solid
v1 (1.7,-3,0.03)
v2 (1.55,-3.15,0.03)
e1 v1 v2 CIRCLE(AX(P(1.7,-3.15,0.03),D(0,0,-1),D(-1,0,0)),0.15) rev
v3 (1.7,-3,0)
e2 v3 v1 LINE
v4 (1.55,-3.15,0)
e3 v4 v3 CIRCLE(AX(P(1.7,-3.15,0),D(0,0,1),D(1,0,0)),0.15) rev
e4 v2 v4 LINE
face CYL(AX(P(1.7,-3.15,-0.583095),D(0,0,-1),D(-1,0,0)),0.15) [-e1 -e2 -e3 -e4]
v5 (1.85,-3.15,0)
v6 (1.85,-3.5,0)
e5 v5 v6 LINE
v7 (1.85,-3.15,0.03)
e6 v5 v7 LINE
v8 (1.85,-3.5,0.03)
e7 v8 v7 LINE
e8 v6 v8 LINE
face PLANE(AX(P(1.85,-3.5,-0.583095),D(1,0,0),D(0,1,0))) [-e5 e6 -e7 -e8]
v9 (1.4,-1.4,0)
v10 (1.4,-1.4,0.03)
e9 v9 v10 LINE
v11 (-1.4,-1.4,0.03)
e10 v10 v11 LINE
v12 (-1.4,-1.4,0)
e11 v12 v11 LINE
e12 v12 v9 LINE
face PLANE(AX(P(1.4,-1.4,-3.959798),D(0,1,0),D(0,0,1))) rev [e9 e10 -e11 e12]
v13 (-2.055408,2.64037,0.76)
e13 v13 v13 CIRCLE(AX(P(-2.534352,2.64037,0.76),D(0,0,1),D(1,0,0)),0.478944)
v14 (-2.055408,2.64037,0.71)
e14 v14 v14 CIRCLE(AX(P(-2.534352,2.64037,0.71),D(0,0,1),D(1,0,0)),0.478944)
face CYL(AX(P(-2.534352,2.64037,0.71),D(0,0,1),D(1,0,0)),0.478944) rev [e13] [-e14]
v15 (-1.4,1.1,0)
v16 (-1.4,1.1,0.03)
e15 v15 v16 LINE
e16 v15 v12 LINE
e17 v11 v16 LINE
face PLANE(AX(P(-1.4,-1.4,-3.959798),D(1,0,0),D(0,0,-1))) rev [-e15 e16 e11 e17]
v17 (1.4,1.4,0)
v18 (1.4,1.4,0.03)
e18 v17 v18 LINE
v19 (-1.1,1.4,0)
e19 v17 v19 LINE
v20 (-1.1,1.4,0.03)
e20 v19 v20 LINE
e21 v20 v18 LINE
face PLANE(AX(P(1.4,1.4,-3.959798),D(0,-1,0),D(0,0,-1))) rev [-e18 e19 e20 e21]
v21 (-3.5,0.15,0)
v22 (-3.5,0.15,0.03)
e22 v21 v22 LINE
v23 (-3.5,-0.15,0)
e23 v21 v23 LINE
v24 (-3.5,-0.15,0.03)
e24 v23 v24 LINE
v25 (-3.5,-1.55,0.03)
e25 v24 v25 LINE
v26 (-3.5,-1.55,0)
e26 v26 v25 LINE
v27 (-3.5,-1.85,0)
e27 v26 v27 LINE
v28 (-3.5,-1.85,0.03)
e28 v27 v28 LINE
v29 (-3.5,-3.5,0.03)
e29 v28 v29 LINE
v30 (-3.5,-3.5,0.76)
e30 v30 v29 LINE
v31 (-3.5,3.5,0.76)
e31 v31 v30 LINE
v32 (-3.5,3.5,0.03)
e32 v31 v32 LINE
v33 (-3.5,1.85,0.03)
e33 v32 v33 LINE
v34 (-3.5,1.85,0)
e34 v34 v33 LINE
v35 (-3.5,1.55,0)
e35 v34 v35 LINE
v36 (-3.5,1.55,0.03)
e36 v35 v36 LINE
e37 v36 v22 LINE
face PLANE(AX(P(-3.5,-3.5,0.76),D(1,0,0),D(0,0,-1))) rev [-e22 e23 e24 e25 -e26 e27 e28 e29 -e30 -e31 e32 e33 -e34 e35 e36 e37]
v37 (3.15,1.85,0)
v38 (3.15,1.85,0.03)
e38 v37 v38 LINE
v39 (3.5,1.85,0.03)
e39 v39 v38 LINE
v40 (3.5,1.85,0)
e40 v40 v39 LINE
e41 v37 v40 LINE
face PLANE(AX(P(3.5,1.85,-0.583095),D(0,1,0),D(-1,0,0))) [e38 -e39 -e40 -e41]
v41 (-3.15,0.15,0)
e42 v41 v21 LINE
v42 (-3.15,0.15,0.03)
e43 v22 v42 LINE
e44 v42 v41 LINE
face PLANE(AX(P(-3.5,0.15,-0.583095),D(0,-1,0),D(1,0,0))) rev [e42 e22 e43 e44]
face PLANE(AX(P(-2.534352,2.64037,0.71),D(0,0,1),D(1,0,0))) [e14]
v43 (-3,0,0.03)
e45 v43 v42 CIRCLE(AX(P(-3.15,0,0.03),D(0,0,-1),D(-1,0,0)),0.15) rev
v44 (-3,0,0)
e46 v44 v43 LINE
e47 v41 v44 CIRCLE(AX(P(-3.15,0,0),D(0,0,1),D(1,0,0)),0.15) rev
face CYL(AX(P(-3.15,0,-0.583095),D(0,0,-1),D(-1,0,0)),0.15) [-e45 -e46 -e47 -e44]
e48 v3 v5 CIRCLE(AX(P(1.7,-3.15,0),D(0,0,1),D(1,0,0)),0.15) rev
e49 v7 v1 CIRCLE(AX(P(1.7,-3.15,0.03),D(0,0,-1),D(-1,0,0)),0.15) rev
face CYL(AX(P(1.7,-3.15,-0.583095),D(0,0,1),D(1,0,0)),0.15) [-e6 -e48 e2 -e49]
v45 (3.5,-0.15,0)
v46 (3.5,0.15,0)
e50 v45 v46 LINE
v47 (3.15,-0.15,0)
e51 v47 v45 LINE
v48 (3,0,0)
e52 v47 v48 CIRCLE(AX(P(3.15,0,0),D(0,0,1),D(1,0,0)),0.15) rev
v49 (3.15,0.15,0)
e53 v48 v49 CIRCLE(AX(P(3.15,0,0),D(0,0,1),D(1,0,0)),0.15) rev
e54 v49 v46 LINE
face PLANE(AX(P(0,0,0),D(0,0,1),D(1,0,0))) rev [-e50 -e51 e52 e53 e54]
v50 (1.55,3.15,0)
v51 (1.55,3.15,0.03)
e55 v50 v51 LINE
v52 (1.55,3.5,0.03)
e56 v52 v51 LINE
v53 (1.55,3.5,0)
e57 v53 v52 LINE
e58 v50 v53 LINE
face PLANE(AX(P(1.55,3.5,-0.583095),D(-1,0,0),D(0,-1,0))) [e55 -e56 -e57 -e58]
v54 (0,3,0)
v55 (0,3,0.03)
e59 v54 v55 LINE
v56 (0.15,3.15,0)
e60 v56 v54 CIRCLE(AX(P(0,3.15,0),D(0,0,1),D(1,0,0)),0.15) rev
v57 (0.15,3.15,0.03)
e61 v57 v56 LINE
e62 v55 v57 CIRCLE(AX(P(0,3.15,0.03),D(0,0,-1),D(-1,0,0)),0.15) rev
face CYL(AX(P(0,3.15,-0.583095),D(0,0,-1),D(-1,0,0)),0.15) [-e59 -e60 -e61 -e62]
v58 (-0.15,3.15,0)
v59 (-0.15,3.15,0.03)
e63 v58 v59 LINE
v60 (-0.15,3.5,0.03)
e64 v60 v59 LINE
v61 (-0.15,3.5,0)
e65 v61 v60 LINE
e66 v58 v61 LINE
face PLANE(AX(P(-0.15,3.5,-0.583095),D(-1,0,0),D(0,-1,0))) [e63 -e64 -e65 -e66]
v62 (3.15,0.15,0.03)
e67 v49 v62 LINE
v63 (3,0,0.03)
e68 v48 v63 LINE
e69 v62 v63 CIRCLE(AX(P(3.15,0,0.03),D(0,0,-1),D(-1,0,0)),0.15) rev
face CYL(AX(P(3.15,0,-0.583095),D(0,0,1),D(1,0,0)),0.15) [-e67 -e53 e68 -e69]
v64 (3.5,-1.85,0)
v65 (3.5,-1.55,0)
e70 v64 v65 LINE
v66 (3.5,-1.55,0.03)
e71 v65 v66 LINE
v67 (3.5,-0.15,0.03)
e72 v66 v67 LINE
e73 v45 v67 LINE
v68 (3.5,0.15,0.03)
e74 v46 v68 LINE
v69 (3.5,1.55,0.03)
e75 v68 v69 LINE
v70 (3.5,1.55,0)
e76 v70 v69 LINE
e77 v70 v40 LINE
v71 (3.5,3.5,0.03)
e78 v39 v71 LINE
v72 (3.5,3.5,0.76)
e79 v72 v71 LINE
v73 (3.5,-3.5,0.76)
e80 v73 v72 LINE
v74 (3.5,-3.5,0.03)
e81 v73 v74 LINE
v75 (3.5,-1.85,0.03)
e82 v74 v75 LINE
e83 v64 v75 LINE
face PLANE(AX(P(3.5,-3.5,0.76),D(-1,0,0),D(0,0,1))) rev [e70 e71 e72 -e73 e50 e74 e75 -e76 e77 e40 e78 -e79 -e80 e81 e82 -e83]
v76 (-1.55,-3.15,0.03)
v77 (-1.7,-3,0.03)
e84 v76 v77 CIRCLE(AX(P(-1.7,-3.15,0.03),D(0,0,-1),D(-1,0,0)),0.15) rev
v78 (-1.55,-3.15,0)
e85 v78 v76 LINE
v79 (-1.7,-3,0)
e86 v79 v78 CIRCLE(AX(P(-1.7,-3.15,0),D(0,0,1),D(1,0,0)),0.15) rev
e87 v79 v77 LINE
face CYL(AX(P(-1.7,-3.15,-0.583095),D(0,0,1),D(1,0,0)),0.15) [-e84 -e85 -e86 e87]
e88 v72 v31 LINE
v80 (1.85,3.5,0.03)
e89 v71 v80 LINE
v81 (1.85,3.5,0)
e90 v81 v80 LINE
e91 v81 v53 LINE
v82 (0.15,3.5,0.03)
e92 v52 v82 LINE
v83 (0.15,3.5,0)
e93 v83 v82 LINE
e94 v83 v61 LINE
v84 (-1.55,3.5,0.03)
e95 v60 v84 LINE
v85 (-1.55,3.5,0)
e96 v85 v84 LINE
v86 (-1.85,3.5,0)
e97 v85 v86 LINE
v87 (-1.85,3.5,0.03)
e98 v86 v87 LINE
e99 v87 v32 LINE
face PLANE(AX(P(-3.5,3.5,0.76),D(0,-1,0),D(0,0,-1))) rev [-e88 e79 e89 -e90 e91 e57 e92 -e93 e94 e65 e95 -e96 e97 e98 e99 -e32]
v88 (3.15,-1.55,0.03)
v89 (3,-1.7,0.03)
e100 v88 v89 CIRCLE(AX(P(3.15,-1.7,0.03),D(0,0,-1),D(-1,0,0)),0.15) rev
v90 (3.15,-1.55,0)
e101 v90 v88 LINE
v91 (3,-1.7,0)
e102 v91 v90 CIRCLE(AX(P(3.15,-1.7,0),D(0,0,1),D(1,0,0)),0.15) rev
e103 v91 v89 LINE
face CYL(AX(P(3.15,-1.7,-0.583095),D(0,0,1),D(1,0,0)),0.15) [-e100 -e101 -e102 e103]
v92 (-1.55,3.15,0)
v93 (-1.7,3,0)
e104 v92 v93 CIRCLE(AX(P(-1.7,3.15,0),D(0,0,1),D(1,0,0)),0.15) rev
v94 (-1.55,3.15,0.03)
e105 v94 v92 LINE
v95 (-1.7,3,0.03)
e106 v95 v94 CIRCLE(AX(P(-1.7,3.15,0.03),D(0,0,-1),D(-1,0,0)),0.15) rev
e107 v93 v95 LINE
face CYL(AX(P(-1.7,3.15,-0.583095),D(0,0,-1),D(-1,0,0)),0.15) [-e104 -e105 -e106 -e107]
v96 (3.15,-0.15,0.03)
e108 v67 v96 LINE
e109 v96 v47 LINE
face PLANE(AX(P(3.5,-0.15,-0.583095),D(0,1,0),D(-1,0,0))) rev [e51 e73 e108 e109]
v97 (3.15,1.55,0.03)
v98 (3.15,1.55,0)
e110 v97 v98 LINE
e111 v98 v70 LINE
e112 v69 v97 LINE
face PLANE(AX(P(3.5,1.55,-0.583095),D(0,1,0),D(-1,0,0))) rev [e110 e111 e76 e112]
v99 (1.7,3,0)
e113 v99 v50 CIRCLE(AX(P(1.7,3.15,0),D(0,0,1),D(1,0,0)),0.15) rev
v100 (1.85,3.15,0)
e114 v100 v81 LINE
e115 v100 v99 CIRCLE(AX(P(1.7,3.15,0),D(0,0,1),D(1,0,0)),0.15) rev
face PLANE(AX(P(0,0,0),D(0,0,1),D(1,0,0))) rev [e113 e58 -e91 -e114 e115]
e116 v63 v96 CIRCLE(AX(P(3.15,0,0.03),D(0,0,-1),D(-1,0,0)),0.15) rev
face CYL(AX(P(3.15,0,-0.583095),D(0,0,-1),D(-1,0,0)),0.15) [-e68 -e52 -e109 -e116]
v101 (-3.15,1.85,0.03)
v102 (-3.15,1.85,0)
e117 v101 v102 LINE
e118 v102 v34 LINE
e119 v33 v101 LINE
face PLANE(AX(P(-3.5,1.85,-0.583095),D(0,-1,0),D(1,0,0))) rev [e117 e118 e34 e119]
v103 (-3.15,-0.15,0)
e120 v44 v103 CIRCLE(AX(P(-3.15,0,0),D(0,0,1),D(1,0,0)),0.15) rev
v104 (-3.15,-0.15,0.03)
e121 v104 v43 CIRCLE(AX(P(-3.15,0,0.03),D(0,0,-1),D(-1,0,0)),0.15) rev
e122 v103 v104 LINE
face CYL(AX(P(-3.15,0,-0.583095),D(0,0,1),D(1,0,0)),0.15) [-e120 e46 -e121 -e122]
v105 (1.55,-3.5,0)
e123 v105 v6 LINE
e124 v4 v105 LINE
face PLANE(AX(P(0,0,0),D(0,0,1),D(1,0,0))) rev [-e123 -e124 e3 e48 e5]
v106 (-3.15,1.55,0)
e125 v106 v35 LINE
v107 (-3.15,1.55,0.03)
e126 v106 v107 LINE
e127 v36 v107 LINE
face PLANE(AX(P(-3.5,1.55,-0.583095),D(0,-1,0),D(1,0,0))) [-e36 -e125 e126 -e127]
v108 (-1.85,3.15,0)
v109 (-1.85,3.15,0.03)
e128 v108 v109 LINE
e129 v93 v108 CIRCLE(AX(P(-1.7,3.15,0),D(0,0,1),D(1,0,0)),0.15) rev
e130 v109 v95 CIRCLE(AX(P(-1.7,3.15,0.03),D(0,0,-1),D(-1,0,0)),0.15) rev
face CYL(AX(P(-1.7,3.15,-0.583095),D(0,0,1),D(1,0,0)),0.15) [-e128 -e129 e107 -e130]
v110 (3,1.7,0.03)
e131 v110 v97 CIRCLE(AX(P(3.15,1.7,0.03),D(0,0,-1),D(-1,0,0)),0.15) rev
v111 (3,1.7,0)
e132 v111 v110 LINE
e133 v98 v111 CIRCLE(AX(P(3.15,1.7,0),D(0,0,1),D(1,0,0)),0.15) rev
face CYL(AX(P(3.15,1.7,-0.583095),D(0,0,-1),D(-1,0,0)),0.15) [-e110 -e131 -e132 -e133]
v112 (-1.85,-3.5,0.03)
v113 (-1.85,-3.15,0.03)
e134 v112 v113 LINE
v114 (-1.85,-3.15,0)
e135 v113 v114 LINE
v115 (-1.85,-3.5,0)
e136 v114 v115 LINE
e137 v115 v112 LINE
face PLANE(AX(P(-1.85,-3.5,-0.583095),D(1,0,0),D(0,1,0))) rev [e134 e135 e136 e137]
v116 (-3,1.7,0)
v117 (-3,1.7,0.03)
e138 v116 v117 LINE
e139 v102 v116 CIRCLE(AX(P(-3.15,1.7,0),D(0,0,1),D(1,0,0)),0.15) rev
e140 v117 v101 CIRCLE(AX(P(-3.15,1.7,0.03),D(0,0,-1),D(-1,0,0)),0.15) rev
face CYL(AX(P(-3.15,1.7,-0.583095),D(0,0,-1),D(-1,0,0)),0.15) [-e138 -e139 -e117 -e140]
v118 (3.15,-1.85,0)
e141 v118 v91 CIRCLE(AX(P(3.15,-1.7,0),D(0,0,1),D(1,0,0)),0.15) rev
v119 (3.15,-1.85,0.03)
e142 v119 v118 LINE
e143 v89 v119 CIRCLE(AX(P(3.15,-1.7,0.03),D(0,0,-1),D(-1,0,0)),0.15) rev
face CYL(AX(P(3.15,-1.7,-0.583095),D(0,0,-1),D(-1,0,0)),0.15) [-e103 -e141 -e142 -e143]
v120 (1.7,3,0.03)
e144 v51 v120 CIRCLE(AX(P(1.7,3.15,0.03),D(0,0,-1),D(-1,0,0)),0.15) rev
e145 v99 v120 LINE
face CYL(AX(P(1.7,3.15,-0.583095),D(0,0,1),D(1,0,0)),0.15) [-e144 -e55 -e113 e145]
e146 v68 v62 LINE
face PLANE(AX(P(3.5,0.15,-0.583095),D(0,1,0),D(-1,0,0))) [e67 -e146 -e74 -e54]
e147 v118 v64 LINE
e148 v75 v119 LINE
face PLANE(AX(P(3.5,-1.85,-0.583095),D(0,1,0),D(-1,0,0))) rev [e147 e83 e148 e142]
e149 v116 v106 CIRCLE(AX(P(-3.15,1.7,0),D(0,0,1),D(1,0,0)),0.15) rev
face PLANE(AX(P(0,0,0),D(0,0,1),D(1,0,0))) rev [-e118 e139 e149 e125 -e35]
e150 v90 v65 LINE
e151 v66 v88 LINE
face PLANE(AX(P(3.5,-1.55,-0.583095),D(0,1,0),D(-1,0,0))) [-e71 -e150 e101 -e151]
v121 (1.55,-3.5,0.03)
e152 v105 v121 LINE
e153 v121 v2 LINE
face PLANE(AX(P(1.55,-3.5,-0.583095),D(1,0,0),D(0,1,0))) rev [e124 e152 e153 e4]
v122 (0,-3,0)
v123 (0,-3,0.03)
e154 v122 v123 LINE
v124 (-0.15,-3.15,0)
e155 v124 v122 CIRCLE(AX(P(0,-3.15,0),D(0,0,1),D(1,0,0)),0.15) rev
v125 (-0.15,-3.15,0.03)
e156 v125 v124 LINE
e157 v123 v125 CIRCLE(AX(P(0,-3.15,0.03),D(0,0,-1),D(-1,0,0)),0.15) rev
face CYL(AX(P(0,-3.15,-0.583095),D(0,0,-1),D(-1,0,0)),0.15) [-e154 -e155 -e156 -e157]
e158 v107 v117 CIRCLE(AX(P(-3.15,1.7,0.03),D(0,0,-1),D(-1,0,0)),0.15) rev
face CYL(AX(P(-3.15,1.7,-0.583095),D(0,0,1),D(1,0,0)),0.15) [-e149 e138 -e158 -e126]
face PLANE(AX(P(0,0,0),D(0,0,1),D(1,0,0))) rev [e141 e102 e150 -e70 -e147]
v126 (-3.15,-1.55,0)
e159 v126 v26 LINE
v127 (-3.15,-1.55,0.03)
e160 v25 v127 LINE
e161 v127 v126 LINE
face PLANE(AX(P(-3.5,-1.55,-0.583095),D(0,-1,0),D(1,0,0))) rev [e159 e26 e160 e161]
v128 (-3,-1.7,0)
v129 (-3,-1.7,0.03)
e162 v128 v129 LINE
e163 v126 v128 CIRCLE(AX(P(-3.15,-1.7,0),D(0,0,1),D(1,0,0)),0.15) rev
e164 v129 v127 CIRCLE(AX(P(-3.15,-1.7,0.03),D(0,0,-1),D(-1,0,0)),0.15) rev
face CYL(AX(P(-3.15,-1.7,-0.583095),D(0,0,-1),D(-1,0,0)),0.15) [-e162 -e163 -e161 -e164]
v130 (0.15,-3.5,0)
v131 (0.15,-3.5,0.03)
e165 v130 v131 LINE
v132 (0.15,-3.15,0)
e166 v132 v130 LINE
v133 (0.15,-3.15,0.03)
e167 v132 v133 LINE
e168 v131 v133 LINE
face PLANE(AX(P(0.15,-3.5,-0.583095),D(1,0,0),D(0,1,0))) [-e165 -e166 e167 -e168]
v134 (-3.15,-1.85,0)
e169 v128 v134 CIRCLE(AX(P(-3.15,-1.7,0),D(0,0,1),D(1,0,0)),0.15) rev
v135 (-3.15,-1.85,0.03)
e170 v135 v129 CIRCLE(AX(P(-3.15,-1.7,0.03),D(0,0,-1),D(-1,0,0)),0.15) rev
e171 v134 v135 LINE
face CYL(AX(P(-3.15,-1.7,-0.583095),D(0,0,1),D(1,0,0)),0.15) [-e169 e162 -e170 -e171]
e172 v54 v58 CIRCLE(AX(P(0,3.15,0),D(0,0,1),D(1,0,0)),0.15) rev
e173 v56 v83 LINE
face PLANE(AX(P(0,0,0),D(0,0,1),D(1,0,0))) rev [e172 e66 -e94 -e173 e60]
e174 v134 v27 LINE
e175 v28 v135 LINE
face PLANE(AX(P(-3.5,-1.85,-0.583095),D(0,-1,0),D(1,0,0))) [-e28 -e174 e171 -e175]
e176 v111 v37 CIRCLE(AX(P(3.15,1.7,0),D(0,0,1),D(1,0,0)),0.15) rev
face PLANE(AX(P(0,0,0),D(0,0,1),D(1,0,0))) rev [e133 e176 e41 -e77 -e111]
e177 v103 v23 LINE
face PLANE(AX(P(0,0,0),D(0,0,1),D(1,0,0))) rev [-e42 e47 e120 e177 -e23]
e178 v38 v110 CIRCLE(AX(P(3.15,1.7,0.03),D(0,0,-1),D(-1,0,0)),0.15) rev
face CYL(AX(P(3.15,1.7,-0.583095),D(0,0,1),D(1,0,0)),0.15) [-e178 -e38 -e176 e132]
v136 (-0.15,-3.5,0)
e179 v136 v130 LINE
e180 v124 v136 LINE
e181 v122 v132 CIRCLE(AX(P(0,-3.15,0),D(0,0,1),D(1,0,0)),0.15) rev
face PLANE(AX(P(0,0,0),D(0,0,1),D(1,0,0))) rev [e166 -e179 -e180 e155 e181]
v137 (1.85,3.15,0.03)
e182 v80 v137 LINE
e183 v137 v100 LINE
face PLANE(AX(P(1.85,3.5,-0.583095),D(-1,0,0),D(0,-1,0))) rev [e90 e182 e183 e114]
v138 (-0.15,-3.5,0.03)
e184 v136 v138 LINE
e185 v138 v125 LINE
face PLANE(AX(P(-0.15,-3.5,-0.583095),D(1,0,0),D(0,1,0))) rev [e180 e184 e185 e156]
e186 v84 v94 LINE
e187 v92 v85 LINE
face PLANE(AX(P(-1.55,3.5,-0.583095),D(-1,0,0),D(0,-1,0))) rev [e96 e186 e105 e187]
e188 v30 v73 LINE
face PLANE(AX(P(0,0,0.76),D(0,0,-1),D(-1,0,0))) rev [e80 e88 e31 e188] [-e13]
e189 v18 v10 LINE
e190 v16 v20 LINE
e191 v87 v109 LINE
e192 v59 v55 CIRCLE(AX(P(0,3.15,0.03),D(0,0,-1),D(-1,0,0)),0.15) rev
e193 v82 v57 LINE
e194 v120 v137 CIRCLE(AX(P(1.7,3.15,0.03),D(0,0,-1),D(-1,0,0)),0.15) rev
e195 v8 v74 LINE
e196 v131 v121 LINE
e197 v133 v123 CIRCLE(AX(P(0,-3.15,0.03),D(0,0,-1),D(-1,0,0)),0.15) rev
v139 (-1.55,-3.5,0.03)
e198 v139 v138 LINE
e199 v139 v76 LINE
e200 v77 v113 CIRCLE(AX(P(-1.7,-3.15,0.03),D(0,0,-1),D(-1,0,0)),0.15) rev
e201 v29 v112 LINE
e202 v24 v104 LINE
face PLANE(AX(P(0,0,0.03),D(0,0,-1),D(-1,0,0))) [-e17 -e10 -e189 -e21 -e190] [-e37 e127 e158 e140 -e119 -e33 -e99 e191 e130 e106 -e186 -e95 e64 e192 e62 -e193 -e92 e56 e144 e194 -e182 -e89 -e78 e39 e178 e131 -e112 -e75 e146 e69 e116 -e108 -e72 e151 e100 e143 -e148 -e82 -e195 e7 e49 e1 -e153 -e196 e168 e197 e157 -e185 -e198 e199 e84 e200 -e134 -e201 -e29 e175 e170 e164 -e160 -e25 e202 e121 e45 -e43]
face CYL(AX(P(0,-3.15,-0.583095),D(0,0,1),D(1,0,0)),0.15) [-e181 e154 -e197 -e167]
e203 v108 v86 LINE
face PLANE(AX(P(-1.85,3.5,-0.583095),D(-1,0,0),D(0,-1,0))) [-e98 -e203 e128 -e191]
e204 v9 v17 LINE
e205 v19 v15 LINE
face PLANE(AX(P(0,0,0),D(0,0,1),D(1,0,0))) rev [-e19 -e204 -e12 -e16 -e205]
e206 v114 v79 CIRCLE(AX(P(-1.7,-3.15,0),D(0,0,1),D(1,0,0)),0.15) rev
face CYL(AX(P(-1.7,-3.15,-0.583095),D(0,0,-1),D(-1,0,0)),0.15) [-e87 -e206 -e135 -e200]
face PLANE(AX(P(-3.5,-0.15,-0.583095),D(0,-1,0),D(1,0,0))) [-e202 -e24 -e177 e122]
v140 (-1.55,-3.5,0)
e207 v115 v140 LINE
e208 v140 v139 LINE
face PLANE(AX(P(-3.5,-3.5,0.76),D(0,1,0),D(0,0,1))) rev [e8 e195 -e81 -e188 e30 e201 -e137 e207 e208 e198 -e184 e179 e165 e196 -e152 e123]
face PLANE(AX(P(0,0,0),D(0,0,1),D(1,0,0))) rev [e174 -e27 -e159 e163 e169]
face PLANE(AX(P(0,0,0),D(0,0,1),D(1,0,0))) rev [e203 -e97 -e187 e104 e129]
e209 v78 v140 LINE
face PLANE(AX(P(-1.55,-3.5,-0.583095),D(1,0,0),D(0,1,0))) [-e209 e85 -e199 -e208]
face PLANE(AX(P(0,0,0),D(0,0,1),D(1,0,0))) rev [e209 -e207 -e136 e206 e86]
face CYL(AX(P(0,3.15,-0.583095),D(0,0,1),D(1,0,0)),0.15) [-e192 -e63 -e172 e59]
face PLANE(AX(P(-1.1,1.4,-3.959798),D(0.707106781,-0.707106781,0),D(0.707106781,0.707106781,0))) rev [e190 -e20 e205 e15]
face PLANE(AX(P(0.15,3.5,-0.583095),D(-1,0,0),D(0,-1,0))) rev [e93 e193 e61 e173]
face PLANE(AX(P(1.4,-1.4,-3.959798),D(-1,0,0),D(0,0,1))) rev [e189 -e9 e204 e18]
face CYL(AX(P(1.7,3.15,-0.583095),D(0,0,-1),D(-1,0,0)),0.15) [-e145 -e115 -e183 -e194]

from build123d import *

# Parameters (mm, degrees)
BOSS_EXTRUDE1_START    = 0.03
SKETCH1_W              = 7
SKETCH1_H              = 7
BOSS_EXTRUDE1_DEPTH    = 0.73
SKETCH2_R              = 0.478943658
CUT_EXTRUDE1_DEPTH     = 0.05
BOSS_EXTRUDE2_DEPTH    = 0.03
SKETCH4_W              = 0.5
SKETCH4_H              = 0.3
BOSS_EXTRUDE3_DEPTH    = 0.03
FILLET1_R              = 0.15
LPATTERN1_COUNT        = 3
LPATTERN1_PITCH        = 1.7
FILLET1_OF_LPATTERN1_R = 0.15
CIRPATTERN1_DEPTH      = 0.03


# Read off the part's stored shape, not the designer's step: CirPattern1
with BuildPart() as part:
    # Sketch1 → Boss-Extrude1 (new body)
    with BuildSketch(Plane.XY.offset(BOSS_EXTRUDE1_START)):
        Rectangle(SKETCH1_W, SKETCH1_H)
    extrude(amount=BOSS_EXTRUDE1_DEPTH)

    # Sketch2 → Cut-Extrude1 (cut)
    with BuildSketch(Plane.XY.offset(0.76)):
        with Locations((-2.534351737, 2.640370435)):
            Circle(SKETCH2_R)
    extrude(amount=-CUT_EXTRUDE1_DEPTH, mode=Mode.SUBTRACT)

    # Sketch3 → Boss-Extrude2 (add)
    with BuildSketch(Plane(origin=(0, 0, 0.03), x_dir=(-1, 0, 0), z_dir=(0, 0, -1))):
        Polygon((1.1, 1.4), (1.4, 1.1), (1.4, -1.4), (-1.4, -1.4), (-1.4, 1.4), align=None)
    extrude(amount=BOSS_EXTRUDE2_DEPTH)

    # Sketch4 → Boss-Extrude3 (add)
    with BuildSketch(Plane(origin=(0, 0, 0.03), x_dir=(-1, 0, 0), z_dir=(0, 0, -1))):
        with Locations((-3.25, 1.7)):
            Rectangle(SKETCH4_W, SKETCH4_H)
    boss_extrude3 = extrude(amount=BOSS_EXTRUDE3_DEPTH)

    # Fillet1
    fillet1_edges = [part.edges().sort_by_distance(p)[0] for p in [
        (3, 1.85, 0.015),
        (3, 1.55, 0.015),
    ]]
    fillet(fillet1_edges, radius=FILLET1_R - 0.0001)  # a hair under: the kernel refuses the full size

    # LPattern1: Boss-Extrude3 ×3
    with Locations(*[(0, -i * LPATTERN1_PITCH, 0) for i in range(1, LPATTERN1_COUNT)]):
        add(boss_extrude3)

    # Fillet1 of LPattern1
    fillet1_of_lpattern1_edges = [part.edges().sort_by_distance(p)[0] for p in [
        (3, 0.15, 0.015),
        (3, -0.15, 0.015),
        (3, -1.55, 0.015),
        (3, -1.85, 0.015),
    ]]
    fillet(fillet1_of_lpattern1_edges, radius=FILLET1_OF_LPATTERN1_R - 0.0001)  # a hair under: the kernel refuses the full size

    # CirPattern1 outline → CirPattern1 (add)
    with BuildSketch(Plane.XY):
        with BuildLine():
            Line((-3.5, 1.85), (-3.5, 1.55))
            Line((-3.5, 1.55), (-3.15, 1.55))
            ThreePointArc((-3.15, 1.55), (-3.043933983, 1.593933983), (-3, 1.7))
            ThreePointArc((-3, 1.7), (-3.043933983, 1.806066017), (-3.15, 1.85))
            Line((-3.15, 1.85), (-3.5, 1.85))
        make_face()
        with BuildLine():
            Line((1.55, -3.15), (1.55, -3.5))
            Line((1.55, -3.5), (1.85, -3.5))
            Line((1.85, -3.5), (1.85, -3.15))
            ThreePointArc((1.85, -3.15), (1.806066017, -3.043933983), (1.7, -3))
            ThreePointArc((1.7, -3), (1.593933983, -3.043933983), (1.55, -3.15))
        make_face()
        with BuildLine():
            Line((-0.15, -3.15), (-0.15, -3.5))
            Line((-0.15, -3.5), (0.15, -3.5))
            Line((0.15, -3.5), (0.15, -3.15))
            ThreePointArc((0.15, -3.15), (0.106066017, -3.043933983), (0, -3))
            ThreePointArc((0, -3), (-0.106066017, -3.043933983), (-0.15, -3.15))
        make_face()
        with BuildLine():
            Line((-1.85, -3.15), (-1.85, -3.5))
            Line((-1.85, -3.5), (-1.55, -3.5))
            Line((-1.55, -3.5), (-1.55, -3.15))
            ThreePointArc((-1.55, -3.15), (-1.593933983, -3.043933983), (-1.7, -3))
            ThreePointArc((-1.7, -3), (-1.806066017, -3.043933983), (-1.85, -3.15))
        make_face()
        with BuildLine():
            Line((-3.15, -1.55), (-3.5, -1.55))
            Line((-3.5, -1.55), (-3.5, -1.85))
            Line((-3.5, -1.85), (-3.15, -1.85))
            ThreePointArc((-3.15, -1.85), (-3.043933983, -1.806066017), (-3, -1.7))
            ThreePointArc((-3, -1.7), (-3.043933983, -1.593933983), (-3.15, -1.55))
        make_face()
        with BuildLine():
            Line((-3.15, 0.15), (-3.5, 0.15))
            Line((-3.5, 0.15), (-3.5, -0.15))
            Line((-3.5, -0.15), (-3.15, -0.15))
            ThreePointArc((-3.15, -0.15), (-3.043933983, -0.106066017), (-3, 0))
            ThreePointArc((-3, 0), (-3.043933983, 0.106066017), (-3.15, 0.15))
        make_face()
        with BuildLine():
            Line((1.85, 3.5), (1.55, 3.5))
            Line((1.55, 3.5), (1.55, 3.15))
            ThreePointArc((1.55, 3.15), (1.593933983, 3.043933983), (1.7, 3))
            ThreePointArc((1.7, 3), (1.806066017, 3.043933983), (1.85, 3.15))
            Line((1.85, 3.15), (1.85, 3.5))
        make_face()
        with BuildLine():
            Line((0.15, 3.5), (-0.15, 3.5))
            Line((-0.15, 3.5), (-0.15, 3.15))
            ThreePointArc((-0.15, 3.15), (-0.106066017, 3.043933983), (0, 3))
            ThreePointArc((0, 3), (0.106066017, 3.043933983), (0.15, 3.15))
            Line((0.15, 3.15), (0.15, 3.5))
        make_face()
        with BuildLine():
            Line((-1.55, 3.5), (-1.85, 3.5))
            Line((-1.85, 3.5), (-1.85, 3.15))
            ThreePointArc((-1.85, 3.15), (-1.806066017, 3.043933983), (-1.7, 3))
            ThreePointArc((-1.7, 3), (-1.593933983, 3.043933983), (-1.55, 3.15))
            Line((-1.55, 3.15), (-1.55, 3.5))
        make_face()
    extrude(amount=CIRPATTERN1_DEPTH)


solid = part.part
